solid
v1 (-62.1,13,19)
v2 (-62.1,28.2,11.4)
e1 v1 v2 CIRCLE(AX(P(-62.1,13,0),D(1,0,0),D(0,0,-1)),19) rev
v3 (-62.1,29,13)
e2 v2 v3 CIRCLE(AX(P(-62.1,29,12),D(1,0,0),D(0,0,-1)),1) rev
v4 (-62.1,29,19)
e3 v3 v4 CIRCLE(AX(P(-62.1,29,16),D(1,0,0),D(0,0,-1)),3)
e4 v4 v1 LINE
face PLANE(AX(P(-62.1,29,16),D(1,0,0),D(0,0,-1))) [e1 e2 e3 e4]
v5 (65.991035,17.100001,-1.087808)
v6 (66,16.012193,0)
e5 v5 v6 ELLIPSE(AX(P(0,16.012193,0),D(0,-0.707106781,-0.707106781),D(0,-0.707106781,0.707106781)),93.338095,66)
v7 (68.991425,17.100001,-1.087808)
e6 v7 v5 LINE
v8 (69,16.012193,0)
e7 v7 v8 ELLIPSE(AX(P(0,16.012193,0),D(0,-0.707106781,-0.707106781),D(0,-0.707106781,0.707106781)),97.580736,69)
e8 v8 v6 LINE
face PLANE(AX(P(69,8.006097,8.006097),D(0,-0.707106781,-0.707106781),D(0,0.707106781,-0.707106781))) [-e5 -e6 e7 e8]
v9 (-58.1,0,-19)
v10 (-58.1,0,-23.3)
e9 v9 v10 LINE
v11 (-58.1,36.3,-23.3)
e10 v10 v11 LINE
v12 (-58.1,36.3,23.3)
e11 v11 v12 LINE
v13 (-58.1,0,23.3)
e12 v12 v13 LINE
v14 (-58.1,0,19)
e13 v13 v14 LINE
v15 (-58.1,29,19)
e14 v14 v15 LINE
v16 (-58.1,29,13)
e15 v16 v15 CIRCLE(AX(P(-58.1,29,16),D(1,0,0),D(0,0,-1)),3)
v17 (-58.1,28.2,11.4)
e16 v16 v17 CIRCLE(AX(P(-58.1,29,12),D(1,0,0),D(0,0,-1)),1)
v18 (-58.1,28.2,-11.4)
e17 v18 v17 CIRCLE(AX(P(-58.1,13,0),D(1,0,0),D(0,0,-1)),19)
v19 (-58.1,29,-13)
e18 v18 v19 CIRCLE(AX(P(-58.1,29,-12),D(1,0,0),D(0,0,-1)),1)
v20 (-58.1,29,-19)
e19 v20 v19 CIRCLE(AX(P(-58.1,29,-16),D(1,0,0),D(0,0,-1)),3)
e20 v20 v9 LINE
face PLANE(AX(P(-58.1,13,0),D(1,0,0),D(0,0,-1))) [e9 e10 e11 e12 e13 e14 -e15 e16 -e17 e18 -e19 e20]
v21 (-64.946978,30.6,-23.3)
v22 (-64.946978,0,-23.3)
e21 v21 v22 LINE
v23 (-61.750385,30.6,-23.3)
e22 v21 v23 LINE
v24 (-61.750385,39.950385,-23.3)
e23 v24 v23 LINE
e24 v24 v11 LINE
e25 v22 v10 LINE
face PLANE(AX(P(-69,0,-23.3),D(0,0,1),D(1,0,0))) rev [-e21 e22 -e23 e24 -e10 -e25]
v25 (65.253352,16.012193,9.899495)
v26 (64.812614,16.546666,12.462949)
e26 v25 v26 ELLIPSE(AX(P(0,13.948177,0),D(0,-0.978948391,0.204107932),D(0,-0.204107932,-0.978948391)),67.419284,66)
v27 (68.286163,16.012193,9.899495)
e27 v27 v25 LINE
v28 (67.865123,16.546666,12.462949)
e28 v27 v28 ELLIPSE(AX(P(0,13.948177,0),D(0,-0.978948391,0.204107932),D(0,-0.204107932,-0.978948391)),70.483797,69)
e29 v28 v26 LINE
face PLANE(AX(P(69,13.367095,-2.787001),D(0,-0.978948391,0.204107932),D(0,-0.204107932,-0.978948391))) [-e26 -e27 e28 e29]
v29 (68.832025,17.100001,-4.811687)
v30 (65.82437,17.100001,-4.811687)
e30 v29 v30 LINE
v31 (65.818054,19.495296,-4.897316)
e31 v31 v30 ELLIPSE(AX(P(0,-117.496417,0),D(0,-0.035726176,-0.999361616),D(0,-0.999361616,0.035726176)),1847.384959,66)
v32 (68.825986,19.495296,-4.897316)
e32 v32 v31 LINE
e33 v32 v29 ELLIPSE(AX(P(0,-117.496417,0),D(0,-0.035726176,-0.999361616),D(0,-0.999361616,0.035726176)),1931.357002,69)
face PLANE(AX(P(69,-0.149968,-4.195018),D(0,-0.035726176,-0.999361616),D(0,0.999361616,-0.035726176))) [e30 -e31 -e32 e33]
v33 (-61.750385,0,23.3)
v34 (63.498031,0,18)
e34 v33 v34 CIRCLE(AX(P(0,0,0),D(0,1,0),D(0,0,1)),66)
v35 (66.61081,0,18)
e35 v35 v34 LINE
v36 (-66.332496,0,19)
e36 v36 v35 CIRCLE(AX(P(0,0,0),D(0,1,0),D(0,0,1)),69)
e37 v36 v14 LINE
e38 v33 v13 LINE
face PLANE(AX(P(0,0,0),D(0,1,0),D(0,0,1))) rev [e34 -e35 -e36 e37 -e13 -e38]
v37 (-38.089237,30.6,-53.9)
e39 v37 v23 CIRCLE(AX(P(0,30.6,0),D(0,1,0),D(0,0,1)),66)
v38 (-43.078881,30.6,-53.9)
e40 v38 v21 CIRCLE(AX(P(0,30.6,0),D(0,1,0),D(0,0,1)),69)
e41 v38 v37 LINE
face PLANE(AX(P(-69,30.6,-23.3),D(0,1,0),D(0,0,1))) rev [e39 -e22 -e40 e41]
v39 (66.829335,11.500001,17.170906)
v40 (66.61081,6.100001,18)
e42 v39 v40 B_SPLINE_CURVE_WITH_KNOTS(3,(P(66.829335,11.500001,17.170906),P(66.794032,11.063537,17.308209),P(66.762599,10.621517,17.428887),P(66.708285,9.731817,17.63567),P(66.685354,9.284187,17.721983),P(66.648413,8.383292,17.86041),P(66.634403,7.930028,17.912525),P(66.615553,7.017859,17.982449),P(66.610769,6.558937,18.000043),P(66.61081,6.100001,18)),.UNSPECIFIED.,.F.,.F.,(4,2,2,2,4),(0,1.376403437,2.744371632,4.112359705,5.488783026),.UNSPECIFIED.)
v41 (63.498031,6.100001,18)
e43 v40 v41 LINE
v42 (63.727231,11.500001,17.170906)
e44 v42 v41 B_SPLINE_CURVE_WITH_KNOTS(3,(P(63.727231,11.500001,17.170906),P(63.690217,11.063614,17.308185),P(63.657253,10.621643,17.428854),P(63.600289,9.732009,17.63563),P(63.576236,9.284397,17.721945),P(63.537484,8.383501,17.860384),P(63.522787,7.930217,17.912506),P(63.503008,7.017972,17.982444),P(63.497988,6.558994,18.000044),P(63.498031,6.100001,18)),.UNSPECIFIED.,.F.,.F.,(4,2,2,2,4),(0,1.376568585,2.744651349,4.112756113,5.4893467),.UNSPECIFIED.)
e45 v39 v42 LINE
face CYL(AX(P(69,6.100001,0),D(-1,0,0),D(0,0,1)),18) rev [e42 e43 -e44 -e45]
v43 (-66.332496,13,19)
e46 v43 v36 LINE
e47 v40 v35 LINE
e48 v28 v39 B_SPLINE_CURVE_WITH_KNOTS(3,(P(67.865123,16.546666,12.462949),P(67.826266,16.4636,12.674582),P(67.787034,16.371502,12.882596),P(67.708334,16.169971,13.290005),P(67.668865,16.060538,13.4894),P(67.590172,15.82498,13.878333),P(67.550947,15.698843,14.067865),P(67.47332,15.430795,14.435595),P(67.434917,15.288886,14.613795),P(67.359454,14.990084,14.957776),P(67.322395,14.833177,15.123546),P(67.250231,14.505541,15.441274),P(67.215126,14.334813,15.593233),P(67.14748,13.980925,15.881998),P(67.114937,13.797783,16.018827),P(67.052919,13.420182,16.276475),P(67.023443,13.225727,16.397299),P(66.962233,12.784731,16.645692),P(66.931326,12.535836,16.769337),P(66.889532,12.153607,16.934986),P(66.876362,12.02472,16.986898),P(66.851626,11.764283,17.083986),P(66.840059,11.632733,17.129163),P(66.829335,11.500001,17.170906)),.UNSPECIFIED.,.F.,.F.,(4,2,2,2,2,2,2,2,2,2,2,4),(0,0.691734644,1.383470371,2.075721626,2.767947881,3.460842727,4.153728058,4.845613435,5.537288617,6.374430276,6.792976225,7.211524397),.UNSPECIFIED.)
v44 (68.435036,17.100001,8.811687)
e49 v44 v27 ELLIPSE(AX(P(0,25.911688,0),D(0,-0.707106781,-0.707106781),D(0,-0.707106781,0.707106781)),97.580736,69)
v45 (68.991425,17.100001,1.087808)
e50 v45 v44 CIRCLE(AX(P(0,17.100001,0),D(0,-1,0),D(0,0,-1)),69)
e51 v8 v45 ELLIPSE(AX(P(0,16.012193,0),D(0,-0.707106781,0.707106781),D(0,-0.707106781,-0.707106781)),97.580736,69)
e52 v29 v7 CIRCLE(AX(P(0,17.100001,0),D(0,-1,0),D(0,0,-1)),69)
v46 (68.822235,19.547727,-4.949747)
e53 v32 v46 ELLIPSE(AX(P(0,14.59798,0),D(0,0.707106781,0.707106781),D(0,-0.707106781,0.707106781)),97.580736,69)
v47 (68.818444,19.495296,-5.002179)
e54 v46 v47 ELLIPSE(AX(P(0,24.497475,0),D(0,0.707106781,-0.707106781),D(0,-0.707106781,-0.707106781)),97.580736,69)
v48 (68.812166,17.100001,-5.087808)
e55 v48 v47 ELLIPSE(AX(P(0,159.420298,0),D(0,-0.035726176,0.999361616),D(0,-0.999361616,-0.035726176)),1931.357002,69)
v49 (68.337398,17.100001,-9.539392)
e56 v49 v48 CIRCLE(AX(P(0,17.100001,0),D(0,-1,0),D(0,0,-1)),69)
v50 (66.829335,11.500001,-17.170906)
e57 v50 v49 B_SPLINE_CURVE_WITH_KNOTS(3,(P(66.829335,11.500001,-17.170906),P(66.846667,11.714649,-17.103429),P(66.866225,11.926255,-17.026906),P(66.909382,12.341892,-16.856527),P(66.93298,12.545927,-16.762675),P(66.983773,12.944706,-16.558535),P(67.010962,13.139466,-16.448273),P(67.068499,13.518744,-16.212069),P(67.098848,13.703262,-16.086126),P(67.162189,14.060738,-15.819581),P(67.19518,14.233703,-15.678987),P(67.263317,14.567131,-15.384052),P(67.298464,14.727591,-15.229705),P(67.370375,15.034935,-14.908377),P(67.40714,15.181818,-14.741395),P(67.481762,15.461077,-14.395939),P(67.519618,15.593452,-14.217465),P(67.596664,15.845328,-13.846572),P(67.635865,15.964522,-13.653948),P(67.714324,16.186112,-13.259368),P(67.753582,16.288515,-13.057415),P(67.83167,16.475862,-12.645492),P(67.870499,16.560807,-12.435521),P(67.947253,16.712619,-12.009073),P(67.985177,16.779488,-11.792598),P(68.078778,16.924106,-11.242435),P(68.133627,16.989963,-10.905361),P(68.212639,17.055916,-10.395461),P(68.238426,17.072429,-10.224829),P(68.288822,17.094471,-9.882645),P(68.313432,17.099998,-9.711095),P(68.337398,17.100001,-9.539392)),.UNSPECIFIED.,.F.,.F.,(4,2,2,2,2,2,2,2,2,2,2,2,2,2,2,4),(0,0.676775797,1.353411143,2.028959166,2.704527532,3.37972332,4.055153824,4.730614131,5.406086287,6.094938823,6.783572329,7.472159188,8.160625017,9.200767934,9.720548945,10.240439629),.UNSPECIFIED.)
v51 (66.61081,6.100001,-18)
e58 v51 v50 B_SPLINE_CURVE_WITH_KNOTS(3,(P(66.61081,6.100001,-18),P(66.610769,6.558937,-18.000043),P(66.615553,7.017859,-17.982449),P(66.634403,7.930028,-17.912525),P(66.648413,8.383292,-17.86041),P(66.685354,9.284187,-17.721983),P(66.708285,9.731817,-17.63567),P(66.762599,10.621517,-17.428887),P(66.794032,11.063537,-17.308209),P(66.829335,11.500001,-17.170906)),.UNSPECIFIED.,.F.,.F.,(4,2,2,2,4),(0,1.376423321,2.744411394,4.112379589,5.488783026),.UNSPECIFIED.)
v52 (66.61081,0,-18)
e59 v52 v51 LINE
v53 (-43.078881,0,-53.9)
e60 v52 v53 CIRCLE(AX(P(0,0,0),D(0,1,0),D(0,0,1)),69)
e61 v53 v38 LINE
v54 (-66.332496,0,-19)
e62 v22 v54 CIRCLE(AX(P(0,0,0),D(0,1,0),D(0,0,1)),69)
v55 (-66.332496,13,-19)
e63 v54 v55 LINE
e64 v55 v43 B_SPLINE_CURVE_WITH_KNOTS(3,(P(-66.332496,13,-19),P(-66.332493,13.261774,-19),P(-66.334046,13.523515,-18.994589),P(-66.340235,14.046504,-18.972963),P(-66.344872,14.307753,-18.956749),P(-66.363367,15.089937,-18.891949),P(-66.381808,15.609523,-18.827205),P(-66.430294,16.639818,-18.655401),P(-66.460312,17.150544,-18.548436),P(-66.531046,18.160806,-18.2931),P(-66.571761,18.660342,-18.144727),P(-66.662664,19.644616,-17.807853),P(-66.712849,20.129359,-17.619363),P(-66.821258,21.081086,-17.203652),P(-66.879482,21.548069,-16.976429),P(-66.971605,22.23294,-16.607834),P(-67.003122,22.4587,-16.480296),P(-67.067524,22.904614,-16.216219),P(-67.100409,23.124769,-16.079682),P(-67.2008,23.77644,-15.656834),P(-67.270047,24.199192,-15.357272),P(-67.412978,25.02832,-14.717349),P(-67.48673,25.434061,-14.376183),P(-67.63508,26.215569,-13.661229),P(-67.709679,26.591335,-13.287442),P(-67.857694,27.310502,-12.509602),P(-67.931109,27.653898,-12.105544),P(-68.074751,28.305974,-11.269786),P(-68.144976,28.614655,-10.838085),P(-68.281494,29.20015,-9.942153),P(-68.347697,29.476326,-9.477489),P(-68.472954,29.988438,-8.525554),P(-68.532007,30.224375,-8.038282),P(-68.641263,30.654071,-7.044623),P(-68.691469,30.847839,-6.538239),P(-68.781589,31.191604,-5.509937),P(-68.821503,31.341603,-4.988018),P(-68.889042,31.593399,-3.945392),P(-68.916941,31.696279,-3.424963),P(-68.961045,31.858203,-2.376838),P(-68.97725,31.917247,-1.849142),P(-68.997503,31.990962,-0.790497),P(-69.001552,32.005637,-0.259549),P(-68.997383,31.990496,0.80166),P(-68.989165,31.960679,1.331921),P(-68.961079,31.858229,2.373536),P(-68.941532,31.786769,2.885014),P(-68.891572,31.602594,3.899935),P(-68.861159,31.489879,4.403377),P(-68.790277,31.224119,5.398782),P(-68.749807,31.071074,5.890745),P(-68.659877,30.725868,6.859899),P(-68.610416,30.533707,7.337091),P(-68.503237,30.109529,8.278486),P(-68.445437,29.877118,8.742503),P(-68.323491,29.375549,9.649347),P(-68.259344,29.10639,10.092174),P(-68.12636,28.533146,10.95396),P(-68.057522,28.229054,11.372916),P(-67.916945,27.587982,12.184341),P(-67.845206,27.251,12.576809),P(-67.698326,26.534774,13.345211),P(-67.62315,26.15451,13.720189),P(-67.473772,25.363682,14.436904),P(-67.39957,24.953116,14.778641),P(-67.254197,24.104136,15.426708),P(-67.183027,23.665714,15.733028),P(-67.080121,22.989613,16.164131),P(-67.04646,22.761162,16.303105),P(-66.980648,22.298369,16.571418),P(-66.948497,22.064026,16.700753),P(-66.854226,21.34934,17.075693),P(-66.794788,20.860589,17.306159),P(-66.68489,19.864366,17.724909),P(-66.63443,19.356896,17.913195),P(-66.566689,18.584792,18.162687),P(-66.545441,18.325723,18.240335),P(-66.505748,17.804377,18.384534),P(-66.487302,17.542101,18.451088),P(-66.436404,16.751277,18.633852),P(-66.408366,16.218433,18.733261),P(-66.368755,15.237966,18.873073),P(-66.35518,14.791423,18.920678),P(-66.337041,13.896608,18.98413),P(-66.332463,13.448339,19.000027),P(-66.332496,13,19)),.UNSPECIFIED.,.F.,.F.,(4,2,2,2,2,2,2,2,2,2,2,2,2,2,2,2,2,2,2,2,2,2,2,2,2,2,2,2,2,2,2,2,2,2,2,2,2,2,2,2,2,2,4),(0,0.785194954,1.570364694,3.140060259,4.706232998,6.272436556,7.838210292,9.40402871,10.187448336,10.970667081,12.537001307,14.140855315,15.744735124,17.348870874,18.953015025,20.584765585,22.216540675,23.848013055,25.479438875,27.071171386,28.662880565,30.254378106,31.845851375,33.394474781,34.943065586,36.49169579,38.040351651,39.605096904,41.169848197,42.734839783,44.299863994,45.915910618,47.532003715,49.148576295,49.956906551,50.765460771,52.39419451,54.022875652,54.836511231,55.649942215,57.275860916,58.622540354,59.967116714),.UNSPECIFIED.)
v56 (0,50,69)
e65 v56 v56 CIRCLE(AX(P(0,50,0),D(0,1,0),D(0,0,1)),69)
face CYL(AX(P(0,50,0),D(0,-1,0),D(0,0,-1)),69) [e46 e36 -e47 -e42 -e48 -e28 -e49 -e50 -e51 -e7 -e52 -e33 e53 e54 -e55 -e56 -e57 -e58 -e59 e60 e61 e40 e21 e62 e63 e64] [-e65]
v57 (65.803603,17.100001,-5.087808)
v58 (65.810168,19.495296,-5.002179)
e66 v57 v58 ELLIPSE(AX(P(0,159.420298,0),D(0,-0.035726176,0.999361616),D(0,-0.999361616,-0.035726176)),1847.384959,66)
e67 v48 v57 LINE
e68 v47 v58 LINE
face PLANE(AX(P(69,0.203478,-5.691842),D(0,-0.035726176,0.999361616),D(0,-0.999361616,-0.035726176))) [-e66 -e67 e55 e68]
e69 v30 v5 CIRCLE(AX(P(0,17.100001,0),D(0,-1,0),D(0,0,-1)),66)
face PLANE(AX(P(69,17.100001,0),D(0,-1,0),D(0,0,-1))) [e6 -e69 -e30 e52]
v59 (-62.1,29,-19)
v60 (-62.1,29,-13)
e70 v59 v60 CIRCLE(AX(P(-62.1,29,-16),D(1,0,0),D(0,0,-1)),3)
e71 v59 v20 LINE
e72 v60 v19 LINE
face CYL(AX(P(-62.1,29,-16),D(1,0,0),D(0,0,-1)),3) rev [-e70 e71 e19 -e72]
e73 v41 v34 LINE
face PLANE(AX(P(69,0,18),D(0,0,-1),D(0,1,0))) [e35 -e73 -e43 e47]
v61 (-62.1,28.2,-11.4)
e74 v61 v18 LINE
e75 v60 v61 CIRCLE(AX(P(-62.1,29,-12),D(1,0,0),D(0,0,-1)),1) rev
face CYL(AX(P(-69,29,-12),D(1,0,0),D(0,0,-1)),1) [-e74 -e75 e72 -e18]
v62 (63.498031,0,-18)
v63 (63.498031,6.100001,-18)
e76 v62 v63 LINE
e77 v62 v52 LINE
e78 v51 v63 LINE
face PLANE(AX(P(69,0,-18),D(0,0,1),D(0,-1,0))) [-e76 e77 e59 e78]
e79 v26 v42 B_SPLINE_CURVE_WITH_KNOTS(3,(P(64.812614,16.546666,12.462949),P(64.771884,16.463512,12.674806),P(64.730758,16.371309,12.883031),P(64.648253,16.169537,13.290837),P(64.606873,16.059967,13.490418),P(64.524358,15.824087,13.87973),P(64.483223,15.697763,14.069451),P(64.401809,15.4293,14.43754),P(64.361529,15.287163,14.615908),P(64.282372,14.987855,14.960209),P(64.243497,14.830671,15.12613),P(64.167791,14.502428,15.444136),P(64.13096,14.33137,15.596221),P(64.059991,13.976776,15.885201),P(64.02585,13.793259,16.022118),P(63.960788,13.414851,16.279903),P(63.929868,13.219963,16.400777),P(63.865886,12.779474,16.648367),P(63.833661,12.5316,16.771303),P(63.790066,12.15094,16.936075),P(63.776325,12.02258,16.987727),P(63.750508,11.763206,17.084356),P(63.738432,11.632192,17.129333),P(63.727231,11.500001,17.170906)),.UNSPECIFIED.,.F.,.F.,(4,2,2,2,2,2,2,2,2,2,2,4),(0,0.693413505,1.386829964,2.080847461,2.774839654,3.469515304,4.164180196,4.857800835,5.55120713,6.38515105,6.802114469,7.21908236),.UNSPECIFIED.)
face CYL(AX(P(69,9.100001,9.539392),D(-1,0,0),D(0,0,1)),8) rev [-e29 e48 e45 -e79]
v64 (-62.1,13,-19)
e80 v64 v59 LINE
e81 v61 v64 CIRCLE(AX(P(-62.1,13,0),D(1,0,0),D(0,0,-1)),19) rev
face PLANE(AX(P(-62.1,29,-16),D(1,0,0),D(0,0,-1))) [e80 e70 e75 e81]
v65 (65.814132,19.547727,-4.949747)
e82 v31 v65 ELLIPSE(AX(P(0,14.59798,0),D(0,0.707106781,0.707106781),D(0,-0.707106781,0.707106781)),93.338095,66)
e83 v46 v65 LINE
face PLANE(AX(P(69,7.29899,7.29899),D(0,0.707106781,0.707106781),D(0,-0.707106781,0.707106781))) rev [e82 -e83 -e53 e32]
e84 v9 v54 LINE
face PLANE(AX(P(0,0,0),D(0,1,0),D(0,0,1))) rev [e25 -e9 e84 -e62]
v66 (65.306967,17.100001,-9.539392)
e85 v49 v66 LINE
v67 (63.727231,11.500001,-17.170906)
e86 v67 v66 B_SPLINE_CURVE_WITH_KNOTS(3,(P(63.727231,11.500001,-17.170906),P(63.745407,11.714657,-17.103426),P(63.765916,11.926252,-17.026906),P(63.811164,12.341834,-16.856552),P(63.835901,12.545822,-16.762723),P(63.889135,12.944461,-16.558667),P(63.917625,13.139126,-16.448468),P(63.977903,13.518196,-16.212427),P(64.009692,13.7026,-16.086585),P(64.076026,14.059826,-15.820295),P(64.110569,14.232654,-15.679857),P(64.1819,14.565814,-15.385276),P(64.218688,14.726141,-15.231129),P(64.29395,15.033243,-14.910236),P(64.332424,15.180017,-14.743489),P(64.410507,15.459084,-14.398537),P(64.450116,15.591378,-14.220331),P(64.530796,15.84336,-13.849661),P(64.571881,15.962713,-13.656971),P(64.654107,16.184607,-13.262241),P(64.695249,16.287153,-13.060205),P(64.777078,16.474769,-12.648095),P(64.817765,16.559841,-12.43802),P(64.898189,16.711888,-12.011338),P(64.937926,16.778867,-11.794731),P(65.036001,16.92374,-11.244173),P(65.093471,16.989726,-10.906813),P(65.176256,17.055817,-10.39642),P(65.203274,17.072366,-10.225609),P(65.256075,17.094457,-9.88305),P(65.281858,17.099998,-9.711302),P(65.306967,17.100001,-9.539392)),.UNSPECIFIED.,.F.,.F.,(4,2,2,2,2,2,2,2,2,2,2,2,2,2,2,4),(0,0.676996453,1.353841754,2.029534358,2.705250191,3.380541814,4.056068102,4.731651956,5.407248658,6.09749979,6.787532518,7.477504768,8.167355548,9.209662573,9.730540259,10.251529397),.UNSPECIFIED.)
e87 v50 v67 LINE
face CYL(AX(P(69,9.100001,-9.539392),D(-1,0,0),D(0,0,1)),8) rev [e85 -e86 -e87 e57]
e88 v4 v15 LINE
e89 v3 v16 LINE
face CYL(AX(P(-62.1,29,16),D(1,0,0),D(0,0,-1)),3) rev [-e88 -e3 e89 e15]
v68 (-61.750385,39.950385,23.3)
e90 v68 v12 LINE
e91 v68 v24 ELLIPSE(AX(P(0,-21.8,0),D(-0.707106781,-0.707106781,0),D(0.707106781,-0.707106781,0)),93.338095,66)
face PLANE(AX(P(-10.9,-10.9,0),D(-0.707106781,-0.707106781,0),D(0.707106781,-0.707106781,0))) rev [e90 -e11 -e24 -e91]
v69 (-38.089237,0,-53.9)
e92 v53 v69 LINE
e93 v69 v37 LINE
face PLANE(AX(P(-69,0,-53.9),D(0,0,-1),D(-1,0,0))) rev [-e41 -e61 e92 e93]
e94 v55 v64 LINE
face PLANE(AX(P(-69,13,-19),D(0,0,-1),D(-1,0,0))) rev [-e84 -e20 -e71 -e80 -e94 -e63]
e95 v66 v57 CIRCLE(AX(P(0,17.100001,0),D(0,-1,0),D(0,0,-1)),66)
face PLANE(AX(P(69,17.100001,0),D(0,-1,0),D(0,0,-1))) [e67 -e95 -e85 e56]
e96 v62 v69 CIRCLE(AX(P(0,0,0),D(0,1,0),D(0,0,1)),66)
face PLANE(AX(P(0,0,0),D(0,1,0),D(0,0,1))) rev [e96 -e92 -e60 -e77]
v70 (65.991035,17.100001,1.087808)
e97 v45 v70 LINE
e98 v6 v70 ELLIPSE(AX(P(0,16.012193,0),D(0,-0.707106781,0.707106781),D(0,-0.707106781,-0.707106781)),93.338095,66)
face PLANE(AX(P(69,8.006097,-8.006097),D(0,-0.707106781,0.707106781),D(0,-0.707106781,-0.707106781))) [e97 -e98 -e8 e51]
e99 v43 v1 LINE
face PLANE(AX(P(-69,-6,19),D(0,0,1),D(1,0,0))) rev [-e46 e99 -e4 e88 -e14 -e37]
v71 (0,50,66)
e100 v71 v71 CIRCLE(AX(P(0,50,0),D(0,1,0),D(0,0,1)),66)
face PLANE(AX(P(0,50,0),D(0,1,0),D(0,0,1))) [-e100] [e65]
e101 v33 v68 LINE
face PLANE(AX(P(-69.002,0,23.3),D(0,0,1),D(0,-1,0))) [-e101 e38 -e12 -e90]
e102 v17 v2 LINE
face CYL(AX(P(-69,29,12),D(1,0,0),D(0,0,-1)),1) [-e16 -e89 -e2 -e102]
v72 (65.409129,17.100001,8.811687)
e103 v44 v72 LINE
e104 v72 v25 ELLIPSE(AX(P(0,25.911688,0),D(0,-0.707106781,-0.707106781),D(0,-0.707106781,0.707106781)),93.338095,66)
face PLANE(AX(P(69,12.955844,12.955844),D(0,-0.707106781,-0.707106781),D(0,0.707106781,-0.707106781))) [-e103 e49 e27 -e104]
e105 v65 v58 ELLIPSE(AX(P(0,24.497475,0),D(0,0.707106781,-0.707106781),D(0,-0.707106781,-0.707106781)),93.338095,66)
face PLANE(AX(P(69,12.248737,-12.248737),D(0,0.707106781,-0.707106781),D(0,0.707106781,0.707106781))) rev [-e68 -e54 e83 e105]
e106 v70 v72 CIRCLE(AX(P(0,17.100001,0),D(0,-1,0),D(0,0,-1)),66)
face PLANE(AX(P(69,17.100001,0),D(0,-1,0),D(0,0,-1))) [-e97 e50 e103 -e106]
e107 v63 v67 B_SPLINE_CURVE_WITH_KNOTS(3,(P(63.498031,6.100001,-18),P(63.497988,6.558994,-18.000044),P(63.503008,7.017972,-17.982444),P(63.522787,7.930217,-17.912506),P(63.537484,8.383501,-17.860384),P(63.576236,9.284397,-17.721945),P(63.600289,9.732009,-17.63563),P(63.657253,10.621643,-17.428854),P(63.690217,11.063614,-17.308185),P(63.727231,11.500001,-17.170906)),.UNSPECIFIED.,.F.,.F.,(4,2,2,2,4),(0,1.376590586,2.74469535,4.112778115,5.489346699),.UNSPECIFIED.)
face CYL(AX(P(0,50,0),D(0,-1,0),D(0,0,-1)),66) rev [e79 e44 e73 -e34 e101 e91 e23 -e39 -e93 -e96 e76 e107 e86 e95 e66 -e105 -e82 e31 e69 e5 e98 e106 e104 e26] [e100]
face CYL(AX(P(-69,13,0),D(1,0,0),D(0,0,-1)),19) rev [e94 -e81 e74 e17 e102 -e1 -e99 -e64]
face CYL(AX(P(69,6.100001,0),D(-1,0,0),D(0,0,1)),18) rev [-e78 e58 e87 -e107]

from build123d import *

# Parameters (mm, degrees)
SKETCH1_R                = 69
SKETCH1_R_2              = 66
BOSS_EXTRUDE1_DEPTH      = 50
SKETCH4_W                = 30.6
SKETCH4_H                = 30.6
CUT_EXTRUDE2_DEPTH       = 110.644881321
CUT_EXTRUDE6_DEPTH       = 110.644881321
BOSS_EXTRUDE2_REACH      = 169.745
BOSS_EXTRUDE2_END_RADIUS = 66
BOSS_EXTRUDE2_START      = -58.1
SKETCH8_W                = 46.6
SKETCH8_H                = 35
BOSS_EXTRUDE4_DEPTH      = 30
SKETCH9_OUTSIDE_W        = 206.079
SKETCH9_OUTSIDE_H        = 183.51
SKETCH9_OUTSIDE_R        = 69
CUT_EXTRUDE7_DEPTH       = 126.083349102
CUT_EXTRUDE8_START       = -36.3
CUT_EXTRUDE8_DEPTH       = 33.706349186
CUT_EXTRUDE9_DEPTH       = 110.644881321
CUT_EXTRUDE11_DEPTH      = 4
FILLET3_R                = 1
CUT_EXTRUDE13_START      = 63.498031084
CUT_EXTRUDE13_DEPTH      = 5.501968916


# Read off the part's stored shape, not the designer's step: Cut-Extrude8, Cut-Extrude13
with BuildPart() as part:
    # Sketch1 → Boss-Extrude1 (new body)
    with BuildSketch(Plane(origin=(0, 0, 0), x_dir=(1, 0, 0), z_dir=(0, 1, 0))):
        with Locations(Location((0, 0, 0), (0, 0, 270))):
            Circle(SKETCH1_R)
        with Locations(Location((0, 0, 0), (0, 0, 270))):
            Circle(SKETCH1_R_2, mode=Mode.SUBTRACT)
    extrude(amount=BOSS_EXTRUDE1_DEPTH)

    # Sketch4 → Cut-Extrude2 (cut, through all)
    with BuildSketch(Plane(origin=(0, 0, 0), x_dir=(0, 0, -1), z_dir=(1, 0, 0))):
        with Locations((38.6, 15.3)):
            Rectangle(SKETCH4_W, SKETCH4_H)
    extrude(amount=-CUT_EXTRUDE2_DEPTH, mode=Mode.SUBTRACT)

    # Sketch5 → Cut-Extrude6 (cut, through all)
    with BuildSketch(Plane(origin=(0, 0, 0), x_dir=(0, 0, -1), z_dir=(1, 0, 0))):
        with BuildLine():
            Line((19, 13), (19, -6))
            Line((19, -6), (-19, -6))
            Line((-19, -6), (-19, 13))
            ThreePointArc((-19, 13), (0, 32), (19, 13))
        make_face()
    extrude(amount=-CUT_EXTRUDE6_DEPTH, mode=Mode.SUBTRACT)

    # Boss-Extrude2: up to this cylinder (the profile starts inside it)
    boss_extrude2_end = Plane(origin=(0, 6.5, 0), z_dir=(0, -1, 0)) * Cylinder(BOSS_EXTRUDE2_END_RADIUS, 472.49, mode=Mode.PRIVATE)
    # Sketch6 → Boss-Extrude2 (add, up to the surface)
    with BuildSketch(Plane(origin=(0, 0, 0), x_dir=(0, 0, -1), z_dir=(1, 0, 0)).offset(BOSS_EXTRUDE2_START), mode=Mode.PRIVATE) as boss_extrude2_sk1:
        with BuildLine():
            Line((19, 13), (19, 0))
            Line((19, 0), (23.3, 0))
            Line((23.3, 0), (23.3, 13))
            ThreePointArc((23.3, 13), (0, 36.3), (-23.3, 13))
            Line((-23.3, 13), (-23.3, 0))
            Line((-23.3, 0), (-19, 0))
            Line((-19, 0), (-19, 13))
            ThreePointArc((-19, 13), (0, 32), (19, 13))
        make_face()
    boss_extrude2_tool1 = extrude(boss_extrude2_sk1.sketch, amount=-BOSS_EXTRUDE2_REACH, mode=Mode.PRIVATE) & boss_extrude2_end
    add(boss_extrude2_tool1.solids().sort_by_distance((-58.1, 6.5, 22.709301))[0])

    # Sketch8 → Boss-Extrude4 (add)
    with BuildSketch(Plane(origin=(-10.9, -10.9, 0), x_dir=(0, 0, -1), z_dir=(-0.7071067811865512, -0.7071067811865438, 0))):
        with Locations((0, -66.582903987)):
            Rectangle(SKETCH8_W, SKETCH8_H)
    extrude(amount=BOSS_EXTRUDE4_DEPTH)

    # Sketch9 outside → Cut-Extrude7 (cut, through all)
    with BuildSketch(Plane.XZ):
        with Locations((-11.2845, 0)):
            Rectangle(SKETCH9_OUTSIDE_W, SKETCH9_OUTSIDE_H)
        with Locations(Location((0, 0, 0), (0, 0, 231.366853746))):
            Circle(SKETCH9_OUTSIDE_R, mode=Mode.SUBTRACT)
    extrude(amount=-CUT_EXTRUDE7_DEPTH, mode=Mode.SUBTRACT)

    # Cut-Extrude8 outline → Cut-Extrude8 (cut)
    with BuildSketch(Plane.XZ.offset(CUT_EXTRUDE8_START)):
        with BuildLine():
            Line((-58.1, 23.3), (-58.1, -23.3))
            Line((-58.1, -23.3), (-61.750384614, -23.3))
            ThreePointArc((-61.750384614, -23.3), (66, 0), (-61.750384614, 23.3))
            Line((-61.750384614, 23.3), (-58.1, 23.3))
        make_face()
    extrude(amount=CUT_EXTRUDE8_DEPTH, mode=Mode.SUBTRACT)

    # Sketch5<2> → Cut-Extrude9 (cut, through all)
    with BuildSketch(Plane(origin=(0, 0, 0), x_dir=(0, 0, -1), z_dir=(1, 0, 0))):
        with BuildLine():
            Line((19, 13), (19, -6))
            Line((19, -6), (-19, -6))
            Line((-19, -6), (-19, 13))
            ThreePointArc((-19, 13), (0, 32), (19, 13))
        make_face()
    extrude(amount=-CUT_EXTRUDE9_DEPTH, mode=Mode.SUBTRACT)

    # Sketch11 → Cut-Extrude11 (cut)
    with BuildSketch(Plane(origin=(-58.1, 0, 0), x_dir=(0, 0, -1), z_dir=(1, 0, 0))):
        with BuildLine():
            Line((-19.000000298, 29.000000238), (-19, 11.000000238))
            Line((-19, 11.000000238), (-13.000000298, 11.000000238))
            Line((-13.000000298, 11.000000238), (-13.000000298, 29.000000238))
            ThreePointArc((-13.000000298, 29.000000238), (-16.000000298, 32.000000238), (-19.000000298, 29.000000238))
        make_face()
        with BuildLine():
            Line((12.999999702, 29.000000238), (12.999999702, 11.000000238))
            Line((12.999999702, 11.000000238), (19, 11.000000238))
            Line((19, 11.000000238), (18.999999702, 29.000000238))
            ThreePointArc((18.999999702, 29.000000238), (15.999999702, 32.000000238), (12.999999702, 29.000000238))
        make_face()
    extrude(amount=-CUT_EXTRUDE11_DEPTH, mode=Mode.SUBTRACT)

    # Fillet3
    fillet3_edges = [part.edges().sort_by_distance(p)[0] for p in [
        (-60.1, 26.85640674, -12.999999702),
        (-60.1, 26.856406181, 13.000000298),
    ]]
    fillet(fillet3_edges, radius=FILLET3_R)

    # Cut-Extrude13 outline → Cut-Extrude13 (cut)
    with BuildSketch(Plane(origin=(0, 0, 0), x_dir=(0, 0, -1), z_dir=(1, 0, 0)).offset(CUT_EXTRUDE13_START)):
        with BuildLine():
            ThreePointArc((-12.462948615, 16.54666605), (-15.389142712, 14.557144886), (-17.170905626, 11.50000124))
            ThreePointArc((-17.170905626, 11.50000124), (-17.791519065, 8.831639827), (-18, 6.10000124))
            Line((-18, 6.10000124), (-18, 0))
            Line((-18, 0), (18, 0))
            Line((18, 0), (18, 6.10000124))
            ThreePointArc((18, 6.10000124), (17.791519065, 8.831639827), (17.170905626, 11.50000124))
            ThreePointArc((17.170905626, 11.50000124), (14.272255841, 15.549807439), (9.539392014, 17.10000124))
            Line((9.539392014, 17.10000124), (5.087807935, 17.10000124))
            Line((5.087807935, 17.10000124), (5.002178544, 19.495296139))
            Line((5.002178544, 19.495296139), (4.949747468, 19.547727215))
            Line((4.949747468, 19.547727215), (4.897316393, 19.495296139))
            Line((4.897316393, 19.495296139), (4.811687002, 17.10000124))
            Line((4.811687002, 17.10000124), (1.087807931, 17.10000124))
            Line((1.087807931, 17.10000124), (0, 16.012193309))
            Line((0, 16.012193309), (-1.087807931, 17.10000124))
            Line((-1.087807931, 17.10000124), (-8.811687005, 17.10000124))
            Line((-8.811687005, 17.10000124), (-9.899494937, 16.012193309))
            Line((-9.899494937, 16.012193309), (-12.462948615, 16.54666605))
        make_face()
    extrude(amount=CUT_EXTRUDE13_DEPTH, mode=Mode.SUBTRACT)


solid = part.part
